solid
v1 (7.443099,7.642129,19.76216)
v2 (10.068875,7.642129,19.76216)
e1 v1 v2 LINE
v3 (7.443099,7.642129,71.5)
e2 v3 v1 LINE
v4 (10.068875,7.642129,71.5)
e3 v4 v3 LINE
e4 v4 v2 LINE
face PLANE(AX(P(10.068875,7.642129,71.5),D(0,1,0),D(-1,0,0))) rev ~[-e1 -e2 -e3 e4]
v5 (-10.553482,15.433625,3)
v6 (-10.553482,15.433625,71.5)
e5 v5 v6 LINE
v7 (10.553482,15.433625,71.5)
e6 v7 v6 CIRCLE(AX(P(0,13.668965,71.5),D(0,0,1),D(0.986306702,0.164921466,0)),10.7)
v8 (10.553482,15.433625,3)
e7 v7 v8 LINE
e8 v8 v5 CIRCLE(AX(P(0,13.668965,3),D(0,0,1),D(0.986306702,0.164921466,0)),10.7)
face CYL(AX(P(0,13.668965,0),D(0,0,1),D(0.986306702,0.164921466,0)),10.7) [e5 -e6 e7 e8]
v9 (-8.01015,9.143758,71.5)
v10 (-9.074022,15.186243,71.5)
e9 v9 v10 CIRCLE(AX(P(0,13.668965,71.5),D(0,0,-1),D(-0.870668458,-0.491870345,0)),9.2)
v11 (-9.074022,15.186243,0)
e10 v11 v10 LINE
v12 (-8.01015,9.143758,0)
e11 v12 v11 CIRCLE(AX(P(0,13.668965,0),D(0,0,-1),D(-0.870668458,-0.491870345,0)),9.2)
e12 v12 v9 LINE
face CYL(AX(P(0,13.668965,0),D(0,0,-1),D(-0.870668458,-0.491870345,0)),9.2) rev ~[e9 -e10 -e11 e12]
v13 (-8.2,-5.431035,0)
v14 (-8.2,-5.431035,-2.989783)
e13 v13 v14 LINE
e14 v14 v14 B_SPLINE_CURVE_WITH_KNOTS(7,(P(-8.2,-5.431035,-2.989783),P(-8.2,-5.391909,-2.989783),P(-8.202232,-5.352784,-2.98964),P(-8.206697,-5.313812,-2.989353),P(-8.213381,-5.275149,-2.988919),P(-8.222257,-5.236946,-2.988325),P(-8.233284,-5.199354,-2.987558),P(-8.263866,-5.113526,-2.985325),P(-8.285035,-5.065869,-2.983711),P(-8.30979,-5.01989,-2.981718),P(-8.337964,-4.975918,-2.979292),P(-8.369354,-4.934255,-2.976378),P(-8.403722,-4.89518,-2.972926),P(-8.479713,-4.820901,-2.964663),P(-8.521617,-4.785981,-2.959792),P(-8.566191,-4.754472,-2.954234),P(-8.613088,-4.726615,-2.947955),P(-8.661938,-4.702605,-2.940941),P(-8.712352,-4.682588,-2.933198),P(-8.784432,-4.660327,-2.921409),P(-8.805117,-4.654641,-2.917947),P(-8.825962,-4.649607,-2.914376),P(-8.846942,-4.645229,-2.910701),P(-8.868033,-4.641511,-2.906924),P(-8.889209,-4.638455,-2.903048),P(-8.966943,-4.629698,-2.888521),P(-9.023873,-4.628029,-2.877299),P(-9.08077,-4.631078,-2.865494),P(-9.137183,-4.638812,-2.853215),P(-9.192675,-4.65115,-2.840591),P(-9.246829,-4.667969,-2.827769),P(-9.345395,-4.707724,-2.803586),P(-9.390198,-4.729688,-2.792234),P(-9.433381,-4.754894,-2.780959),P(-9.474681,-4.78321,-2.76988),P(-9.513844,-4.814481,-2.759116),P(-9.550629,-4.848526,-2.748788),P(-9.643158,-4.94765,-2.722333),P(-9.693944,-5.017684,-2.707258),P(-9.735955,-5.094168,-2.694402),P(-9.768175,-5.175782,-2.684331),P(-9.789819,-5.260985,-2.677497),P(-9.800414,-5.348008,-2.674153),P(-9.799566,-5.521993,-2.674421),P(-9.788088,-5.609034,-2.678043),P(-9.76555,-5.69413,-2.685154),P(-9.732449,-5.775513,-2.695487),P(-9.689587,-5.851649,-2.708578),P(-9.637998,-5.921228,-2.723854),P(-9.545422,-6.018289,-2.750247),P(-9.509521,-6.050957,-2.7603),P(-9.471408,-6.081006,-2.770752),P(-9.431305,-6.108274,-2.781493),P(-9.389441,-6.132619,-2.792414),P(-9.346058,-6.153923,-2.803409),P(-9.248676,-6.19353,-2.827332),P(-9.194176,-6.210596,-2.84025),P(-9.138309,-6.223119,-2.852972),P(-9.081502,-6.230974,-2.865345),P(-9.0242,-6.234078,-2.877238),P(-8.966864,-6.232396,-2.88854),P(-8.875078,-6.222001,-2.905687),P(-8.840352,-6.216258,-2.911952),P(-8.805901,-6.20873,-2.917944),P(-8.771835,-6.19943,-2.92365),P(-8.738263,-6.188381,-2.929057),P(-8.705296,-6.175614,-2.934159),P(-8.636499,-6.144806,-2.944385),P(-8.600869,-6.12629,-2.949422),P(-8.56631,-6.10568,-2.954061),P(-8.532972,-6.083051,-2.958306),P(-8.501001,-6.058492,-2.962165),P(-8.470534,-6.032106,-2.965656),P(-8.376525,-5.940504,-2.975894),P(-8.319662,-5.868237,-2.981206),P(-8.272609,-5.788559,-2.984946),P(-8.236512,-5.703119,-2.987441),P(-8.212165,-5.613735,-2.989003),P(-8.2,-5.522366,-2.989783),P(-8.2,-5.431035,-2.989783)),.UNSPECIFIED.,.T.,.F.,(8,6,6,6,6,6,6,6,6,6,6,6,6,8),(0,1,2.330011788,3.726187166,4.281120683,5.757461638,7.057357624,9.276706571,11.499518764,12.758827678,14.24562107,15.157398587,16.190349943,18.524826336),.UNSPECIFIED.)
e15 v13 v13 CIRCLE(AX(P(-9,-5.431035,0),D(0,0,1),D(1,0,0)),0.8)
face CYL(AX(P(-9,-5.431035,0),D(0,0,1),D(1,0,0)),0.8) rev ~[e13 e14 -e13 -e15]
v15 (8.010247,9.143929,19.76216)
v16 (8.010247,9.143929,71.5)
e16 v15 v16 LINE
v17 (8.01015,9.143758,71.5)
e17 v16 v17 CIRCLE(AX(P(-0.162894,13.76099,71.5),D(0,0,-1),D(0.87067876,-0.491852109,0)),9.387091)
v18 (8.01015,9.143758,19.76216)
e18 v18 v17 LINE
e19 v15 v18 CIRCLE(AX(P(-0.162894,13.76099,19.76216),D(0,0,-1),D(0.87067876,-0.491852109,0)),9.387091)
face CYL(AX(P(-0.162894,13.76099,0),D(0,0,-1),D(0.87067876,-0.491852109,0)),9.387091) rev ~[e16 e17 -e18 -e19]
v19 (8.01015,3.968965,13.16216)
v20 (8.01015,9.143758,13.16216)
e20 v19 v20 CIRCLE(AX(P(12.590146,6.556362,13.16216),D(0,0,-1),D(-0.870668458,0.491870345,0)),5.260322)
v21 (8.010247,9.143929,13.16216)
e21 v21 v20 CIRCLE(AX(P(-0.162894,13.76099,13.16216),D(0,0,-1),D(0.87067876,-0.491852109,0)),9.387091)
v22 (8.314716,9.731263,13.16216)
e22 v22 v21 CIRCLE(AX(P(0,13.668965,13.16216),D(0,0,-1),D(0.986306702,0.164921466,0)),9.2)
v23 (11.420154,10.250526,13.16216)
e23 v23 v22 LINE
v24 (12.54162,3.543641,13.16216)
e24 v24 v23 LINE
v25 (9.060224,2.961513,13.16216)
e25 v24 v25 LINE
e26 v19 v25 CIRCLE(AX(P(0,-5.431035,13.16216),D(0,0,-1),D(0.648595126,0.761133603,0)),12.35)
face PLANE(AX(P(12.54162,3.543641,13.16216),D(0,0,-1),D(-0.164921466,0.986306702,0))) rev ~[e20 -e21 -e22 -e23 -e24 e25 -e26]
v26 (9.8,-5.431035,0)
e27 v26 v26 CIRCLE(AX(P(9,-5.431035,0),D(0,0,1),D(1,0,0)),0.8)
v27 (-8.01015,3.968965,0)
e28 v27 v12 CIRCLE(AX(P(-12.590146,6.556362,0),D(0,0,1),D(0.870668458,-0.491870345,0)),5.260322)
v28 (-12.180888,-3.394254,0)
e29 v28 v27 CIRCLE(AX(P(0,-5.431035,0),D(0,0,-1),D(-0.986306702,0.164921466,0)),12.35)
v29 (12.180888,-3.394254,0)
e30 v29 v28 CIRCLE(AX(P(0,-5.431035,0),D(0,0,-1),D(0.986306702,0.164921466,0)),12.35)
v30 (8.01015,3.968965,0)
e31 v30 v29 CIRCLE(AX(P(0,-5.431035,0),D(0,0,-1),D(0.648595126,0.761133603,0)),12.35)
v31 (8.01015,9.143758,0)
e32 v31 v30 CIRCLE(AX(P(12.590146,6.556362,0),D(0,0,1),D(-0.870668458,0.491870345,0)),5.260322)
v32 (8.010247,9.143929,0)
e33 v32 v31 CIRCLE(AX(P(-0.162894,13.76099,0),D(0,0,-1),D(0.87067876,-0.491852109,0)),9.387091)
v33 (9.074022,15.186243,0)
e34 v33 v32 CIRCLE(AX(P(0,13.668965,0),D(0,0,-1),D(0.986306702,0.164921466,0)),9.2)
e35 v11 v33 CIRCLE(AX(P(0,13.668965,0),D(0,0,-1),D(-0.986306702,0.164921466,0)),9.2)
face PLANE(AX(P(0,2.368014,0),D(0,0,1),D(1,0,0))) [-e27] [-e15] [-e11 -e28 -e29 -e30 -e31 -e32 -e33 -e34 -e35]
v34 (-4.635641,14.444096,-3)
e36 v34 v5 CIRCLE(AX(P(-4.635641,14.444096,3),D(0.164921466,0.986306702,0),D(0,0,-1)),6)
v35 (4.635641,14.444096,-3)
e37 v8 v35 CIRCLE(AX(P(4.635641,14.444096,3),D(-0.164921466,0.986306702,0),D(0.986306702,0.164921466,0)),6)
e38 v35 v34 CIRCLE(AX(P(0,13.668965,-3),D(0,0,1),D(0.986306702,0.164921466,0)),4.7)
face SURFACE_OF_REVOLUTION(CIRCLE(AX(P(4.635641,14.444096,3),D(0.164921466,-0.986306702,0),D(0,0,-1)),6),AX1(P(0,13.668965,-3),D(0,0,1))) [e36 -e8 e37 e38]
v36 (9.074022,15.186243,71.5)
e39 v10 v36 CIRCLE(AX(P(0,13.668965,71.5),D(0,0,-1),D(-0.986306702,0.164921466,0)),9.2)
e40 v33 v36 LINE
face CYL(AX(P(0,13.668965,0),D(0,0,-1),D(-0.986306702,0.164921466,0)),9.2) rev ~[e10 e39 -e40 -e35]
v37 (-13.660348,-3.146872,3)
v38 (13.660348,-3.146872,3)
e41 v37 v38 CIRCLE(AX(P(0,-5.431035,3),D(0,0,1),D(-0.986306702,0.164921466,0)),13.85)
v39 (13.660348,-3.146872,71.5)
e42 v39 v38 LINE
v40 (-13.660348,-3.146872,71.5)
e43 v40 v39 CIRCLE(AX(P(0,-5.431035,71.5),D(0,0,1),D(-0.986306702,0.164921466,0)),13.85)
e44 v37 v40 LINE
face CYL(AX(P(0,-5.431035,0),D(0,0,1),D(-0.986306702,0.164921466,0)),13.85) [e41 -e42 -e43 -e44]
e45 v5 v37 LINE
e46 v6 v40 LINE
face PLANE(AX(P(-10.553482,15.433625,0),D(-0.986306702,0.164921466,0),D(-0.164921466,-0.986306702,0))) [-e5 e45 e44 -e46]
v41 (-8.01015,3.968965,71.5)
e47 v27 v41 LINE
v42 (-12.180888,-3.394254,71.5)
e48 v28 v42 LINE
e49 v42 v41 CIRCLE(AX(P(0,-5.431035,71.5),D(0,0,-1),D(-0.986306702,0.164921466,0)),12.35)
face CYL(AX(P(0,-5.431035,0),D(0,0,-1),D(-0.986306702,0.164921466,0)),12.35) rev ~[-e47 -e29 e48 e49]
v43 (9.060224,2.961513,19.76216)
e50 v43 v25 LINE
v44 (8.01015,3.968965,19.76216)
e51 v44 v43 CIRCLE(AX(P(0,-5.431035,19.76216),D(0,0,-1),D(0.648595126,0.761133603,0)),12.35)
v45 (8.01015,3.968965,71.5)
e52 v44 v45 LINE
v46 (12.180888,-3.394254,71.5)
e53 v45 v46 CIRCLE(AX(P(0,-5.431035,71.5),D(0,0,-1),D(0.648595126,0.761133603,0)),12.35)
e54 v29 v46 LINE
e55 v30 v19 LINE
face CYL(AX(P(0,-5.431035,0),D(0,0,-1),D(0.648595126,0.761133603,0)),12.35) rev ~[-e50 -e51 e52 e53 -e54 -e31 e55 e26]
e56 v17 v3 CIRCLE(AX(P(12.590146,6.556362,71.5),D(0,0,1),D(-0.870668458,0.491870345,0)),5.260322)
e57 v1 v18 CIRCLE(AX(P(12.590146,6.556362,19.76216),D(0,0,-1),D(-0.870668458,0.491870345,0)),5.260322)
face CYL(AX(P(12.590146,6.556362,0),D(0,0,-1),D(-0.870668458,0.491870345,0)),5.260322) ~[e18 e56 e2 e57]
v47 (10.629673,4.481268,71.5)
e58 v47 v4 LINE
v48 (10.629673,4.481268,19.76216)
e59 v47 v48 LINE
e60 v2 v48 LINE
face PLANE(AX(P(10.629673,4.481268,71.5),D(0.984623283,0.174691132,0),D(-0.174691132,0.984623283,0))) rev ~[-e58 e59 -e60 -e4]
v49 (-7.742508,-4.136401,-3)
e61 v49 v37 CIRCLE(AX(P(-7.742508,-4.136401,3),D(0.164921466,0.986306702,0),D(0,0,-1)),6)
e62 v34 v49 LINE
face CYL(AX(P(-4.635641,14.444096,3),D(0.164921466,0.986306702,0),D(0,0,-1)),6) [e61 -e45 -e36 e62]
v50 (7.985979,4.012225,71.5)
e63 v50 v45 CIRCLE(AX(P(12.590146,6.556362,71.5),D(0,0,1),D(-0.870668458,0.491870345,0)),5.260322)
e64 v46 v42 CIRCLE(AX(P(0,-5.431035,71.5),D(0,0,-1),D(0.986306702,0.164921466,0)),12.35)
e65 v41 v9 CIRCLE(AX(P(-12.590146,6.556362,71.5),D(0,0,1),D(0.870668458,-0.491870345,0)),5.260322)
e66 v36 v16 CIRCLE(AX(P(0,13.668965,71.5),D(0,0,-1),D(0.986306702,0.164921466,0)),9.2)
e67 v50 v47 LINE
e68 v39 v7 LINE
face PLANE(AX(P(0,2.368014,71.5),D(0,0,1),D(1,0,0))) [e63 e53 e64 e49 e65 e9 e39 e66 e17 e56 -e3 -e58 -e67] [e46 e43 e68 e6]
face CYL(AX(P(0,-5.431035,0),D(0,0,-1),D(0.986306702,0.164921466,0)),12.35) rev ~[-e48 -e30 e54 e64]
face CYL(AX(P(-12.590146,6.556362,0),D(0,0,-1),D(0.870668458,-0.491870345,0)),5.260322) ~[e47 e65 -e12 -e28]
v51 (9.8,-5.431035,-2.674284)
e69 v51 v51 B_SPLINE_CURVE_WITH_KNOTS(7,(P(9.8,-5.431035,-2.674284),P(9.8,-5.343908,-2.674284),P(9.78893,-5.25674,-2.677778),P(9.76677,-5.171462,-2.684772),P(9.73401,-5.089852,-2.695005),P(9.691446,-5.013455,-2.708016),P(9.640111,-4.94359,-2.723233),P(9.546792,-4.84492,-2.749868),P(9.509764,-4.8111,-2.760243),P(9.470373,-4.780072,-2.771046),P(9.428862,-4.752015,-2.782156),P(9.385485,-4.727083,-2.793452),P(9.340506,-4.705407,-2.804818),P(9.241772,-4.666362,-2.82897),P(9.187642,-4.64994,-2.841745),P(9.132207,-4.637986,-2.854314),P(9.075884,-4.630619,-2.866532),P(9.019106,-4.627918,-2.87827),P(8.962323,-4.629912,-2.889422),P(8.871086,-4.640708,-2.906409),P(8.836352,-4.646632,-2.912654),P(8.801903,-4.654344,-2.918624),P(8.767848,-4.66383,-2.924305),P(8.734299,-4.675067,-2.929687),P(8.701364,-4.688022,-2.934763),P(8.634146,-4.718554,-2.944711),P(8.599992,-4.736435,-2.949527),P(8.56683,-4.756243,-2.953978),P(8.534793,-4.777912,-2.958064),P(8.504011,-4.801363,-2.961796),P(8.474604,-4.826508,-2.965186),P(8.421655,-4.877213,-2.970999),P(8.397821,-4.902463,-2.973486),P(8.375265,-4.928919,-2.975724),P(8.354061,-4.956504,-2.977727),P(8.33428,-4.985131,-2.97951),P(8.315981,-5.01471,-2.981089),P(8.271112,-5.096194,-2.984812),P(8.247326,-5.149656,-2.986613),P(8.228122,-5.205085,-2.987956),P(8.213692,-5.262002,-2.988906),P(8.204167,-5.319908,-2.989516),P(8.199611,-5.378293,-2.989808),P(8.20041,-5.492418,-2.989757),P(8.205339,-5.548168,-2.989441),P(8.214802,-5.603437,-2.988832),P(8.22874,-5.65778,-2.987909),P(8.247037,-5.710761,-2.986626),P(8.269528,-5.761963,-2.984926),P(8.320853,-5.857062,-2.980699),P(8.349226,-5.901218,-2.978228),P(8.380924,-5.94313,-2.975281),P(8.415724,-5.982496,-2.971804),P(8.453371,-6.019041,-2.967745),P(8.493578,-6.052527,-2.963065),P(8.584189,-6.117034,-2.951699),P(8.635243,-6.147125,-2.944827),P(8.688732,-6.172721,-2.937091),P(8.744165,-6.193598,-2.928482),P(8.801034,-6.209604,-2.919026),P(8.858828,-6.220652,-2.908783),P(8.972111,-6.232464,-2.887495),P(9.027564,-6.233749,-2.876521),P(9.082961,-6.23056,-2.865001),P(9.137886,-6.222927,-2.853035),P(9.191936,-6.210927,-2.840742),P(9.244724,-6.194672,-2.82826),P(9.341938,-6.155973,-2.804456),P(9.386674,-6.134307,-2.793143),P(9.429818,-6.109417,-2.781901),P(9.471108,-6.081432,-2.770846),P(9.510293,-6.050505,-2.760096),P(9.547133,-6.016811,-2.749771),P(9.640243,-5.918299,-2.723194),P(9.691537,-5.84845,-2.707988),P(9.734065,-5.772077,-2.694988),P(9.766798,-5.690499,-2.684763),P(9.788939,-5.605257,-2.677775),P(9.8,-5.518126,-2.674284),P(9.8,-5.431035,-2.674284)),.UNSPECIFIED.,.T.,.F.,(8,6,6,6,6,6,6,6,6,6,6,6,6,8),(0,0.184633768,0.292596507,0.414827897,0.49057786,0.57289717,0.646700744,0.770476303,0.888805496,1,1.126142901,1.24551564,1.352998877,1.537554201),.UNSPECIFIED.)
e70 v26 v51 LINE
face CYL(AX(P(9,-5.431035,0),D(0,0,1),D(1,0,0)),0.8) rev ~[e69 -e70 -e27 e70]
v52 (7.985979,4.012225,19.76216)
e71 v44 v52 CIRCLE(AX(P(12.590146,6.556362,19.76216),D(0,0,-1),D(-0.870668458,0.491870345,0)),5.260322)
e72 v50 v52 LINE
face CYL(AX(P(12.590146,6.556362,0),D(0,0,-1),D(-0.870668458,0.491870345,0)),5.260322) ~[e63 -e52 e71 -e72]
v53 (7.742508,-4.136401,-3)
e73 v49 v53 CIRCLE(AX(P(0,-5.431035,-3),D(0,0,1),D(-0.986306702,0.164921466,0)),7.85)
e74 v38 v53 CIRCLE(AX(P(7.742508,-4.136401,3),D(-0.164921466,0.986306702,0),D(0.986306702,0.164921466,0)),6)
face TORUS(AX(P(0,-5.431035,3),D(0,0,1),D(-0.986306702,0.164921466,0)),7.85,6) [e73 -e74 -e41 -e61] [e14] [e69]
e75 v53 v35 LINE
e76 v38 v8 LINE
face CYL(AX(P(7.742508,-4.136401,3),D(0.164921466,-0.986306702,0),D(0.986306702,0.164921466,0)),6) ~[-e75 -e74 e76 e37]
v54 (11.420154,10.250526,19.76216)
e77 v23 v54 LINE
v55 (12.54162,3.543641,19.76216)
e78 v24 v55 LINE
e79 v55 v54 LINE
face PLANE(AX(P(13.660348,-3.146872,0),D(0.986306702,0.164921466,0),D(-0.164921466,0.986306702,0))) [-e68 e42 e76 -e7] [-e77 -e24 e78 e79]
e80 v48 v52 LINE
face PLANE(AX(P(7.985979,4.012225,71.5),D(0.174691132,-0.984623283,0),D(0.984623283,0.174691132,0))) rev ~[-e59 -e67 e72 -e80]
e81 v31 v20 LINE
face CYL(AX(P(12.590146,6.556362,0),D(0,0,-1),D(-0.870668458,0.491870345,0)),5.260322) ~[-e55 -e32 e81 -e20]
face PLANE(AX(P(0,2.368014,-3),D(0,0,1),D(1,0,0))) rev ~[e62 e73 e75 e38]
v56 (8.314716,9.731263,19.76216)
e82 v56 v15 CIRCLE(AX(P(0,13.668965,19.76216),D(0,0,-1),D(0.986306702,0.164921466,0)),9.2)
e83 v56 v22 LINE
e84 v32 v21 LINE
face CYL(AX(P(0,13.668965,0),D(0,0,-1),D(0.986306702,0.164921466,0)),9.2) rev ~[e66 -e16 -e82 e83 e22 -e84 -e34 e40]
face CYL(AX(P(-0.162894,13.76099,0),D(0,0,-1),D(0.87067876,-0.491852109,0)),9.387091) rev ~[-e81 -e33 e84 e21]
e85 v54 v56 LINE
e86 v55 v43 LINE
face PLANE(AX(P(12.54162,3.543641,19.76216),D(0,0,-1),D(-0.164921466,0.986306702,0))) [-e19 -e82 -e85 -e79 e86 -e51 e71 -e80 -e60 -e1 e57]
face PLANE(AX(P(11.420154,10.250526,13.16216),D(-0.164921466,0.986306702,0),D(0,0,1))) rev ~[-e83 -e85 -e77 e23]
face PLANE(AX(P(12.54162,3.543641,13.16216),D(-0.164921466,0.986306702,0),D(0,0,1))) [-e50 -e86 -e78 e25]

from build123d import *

# Parameters (mm, degrees)
F1_DEPTH    = 71.5
F0_R        = 0.8
F2_DEPTH    = 3
F3_T1_DEPTH = 18.8384580048
F3_T3_DEPTH = 18.8384580048
F3_T6_ANGLE = 198.9853445977
F3_T8_ANGLE = 161.0146554023
F6_W        = 6.8
F6_H        = 6.6
F7_DEPTH    = 10
F9_DEPTH    = 57.4


# Not quite as in the source:
# - a fillet or chamfer that OpenCascade refuses, or shapes differently, is made with other operations: its cross-section is extruded or revolved along the edge and cut away or added


with BuildPart() as f1:
    # F0 (on Top) → F1 (new body)
    with BuildSketch(Plane.XY):
        with BuildLine():
            ThreePointArc((10.5534817095, 15.4336250836), (0, 24.3689653978), (-10.5534817095, 15.4336250836))
            Line((-10.5534817095, 15.4336250836), (-13.6603478203, -3.1468722986))
            ThreePointArc((-13.6603478203, -3.1468722986), (0, -19.2810346022), (13.6603478203, -3.1468722986))
            Line((13.6603478203, -3.1468722986), (10.5534817095, 15.4336250836))
        make_face()
        with BuildLine():
            ThreePointArc((-12.1808877675, -3.3942544975), (-10.7458713669, 0.6557337165), (-8.0101498113, 3.9689653978))
            ThreePointArc((-8.0101498113, 3.9689653978), (-7.3298242511, 6.556361809), (-8.0101498113, 9.1437582202))
            ThreePointArc((-8.0101498113, 9.1437582202), (-9.0606365073, 12.0737017575), (-9.0740216568, 15.1862428847))
            ThreePointArc((-9.0740216568, 15.1862428847), (0, 22.8689653978), (9.0740216568, 15.1862428847))
            ThreePointArc((9.0740216568, 15.1862428847), (9.0606535532, 12.0737985759), (8.0102465186, 9.1439294077))
            ThreePointArc((8.0102465186, 9.1439294077), (8.0101981654, 9.1438438137), (8.0101498113, 9.1437582202))
            ThreePointArc((8.0101498113, 9.1437582202), (7.3298242511, 6.556361809), (8.0101498113, 3.9689653978))
            ThreePointArc((8.0101498113, 3.9689653978), (10.7458713669, 0.6557337165), (12.1808877675, -3.3942544975))
            ThreePointArc((12.1808877675, -3.3942544975), (0, -17.7810346022), (-12.1808877675, -3.3942544975))
        make_face(mode=Mode.SUBTRACT)
    extrude(amount=F1_DEPTH)

    # F0 (on Top) → F2 (join)
    with BuildSketch(Plane.XY):
        with BuildLine():
            ThreePointArc((10.5534817095, 15.4336250836), (0, 24.3689653978), (-10.5534817095, 15.4336250836))
            Line((-10.5534817095, 15.4336250836), (-13.6603478203, -3.1468722986))
            ThreePointArc((-13.6603478203, -3.1468722986), (0, -19.2810346022), (13.6603478203, -3.1468722986))
            Line((13.6603478203, -3.1468722986), (10.5534817095, 15.4336250836))
        make_face()
        with BuildLine():
            ThreePointArc((-12.1808877675, -3.3942544975), (-10.7458713669, 0.6557337165), (-8.0101498113, 3.9689653978))
            ThreePointArc((-8.0101498113, 3.9689653978), (-7.3298242511, 6.556361809), (-8.0101498113, 9.1437582202))
            ThreePointArc((-8.0101498113, 9.1437582202), (-9.0606365073, 12.0737017575), (-9.0740216568, 15.1862428847))
            ThreePointArc((-9.0740216568, 15.1862428847), (0, 22.8689653978), (9.0740216568, 15.1862428847))
            ThreePointArc((9.0740216568, 15.1862428847), (9.0606535532, 12.0737985759), (8.0102465186, 9.1439294077))
            ThreePointArc((8.0102465186, 9.1439294077), (8.0101981654, 9.1438438137), (8.0101498113, 9.1437582202))
            ThreePointArc((8.0101498113, 9.1437582202), (7.3298242511, 6.556361809), (8.0101498113, 3.9689653978))
            ThreePointArc((8.0101498113, 3.9689653978), (10.7458713669, 0.6557337165), (12.1808877675, -3.3942544975))
            ThreePointArc((12.1808877675, -3.3942544975), (0, -17.7810346022), (-12.1808877675, -3.3942544975))
        make_face(mode=Mode.SUBTRACT)
        with BuildLine():
            ThreePointArc((-9.0740216568, 15.1862428847), (-9.0606365073, 12.0737017575), (-8.0101498113, 9.1437582202))
            ThreePointArc((-8.0101498113, 9.1437582202), (0, 4.4689653978), (8.0101498113, 9.1437582202))
            ThreePointArc((8.0101498113, 9.1437582202), (8.0101981654, 9.1438438137), (8.0102465186, 9.1439294077))
            ThreePointArc((8.0102465186, 9.1439294077), (9.0606535532, 12.0737985759), (9.0740216568, 15.1862428847))
            ThreePointArc((9.0740216568, 15.1862428847), (0, 22.8689653978), (-9.0740216568, 15.1862428847))
        make_face()
        with BuildLine():
            ThreePointArc((-8.0101498113, 9.1437582202), (-7.3298242511, 6.556361809), (-8.0101498113, 3.9689653978))
            Line((-8.0101498113, 3.9689653978), (8.0101498113, 3.9689653978))
            ThreePointArc((8.0101498113, 3.9689653978), (7.3298242511, 6.556361809), (8.0101498113, 9.1437582202))
            ThreePointArc((8.0101498113, 9.1437582202), (0, 4.4689653978), (-8.0101498113, 9.1437582202))
        make_face()
        with BuildLine():
            Line((8.0101498113, 3.9689653978), (-8.0101498113, 3.9689653978))
            ThreePointArc((-8.0101498113, 3.9689653978), (-10.7458713669, 0.6557337165), (-12.1808877675, -3.3942544975))
            ThreePointArc((-12.1808877675, -3.3942544975), (0, -17.7810346022), (12.1808877675, -3.3942544975))
            ThreePointArc((12.1808877675, -3.3942544975), (10.7458713669, 0.6557337165), (8.0101498113, 3.9689653978))
        make_face()
        with Locations((-9, -5.4310346022)):
            Circle(F0_R, mode=Mode.SUBTRACT)
        with Locations((9, -5.4310346022)):
            Circle(F0_R, mode=Mode.SUBTRACT)
    extrude(amount=-F2_DEPTH)

    # F3: fillet of radius 6 on 1 edges, made by hand

    # F3_s2 → F3_t1 (cut)
    with BuildSketch(Plane(origin=(2.22343693, 13.2971819786, 0), x_dir=(0, 0, 1), z_dir=(-0.164921466, -0.9863067018, 0))):
        with BuildLine():
            ThreePointArc((-3, 6.9543058117), (-1.2426406871, 11.1969464988), (3, 12.9543058117))
            Line((3, 12.9543058117), (-3, 12.9543058117))
            Line((-3, 12.9543058117), (-3, 6.9543058117))
        make_face()
    extrude(amount=F3_T1_DEPTH, mode=Mode.SUBTRACT)

    # F3_s4 → F3_t3 (cut)
    with BuildSketch(Plane(origin=(0.8834291807, -5.2833154036, 0), x_dir=(0, 0, 1), z_dir=(-0.164921466, 0.9863067018, 0))):
        with BuildLine():
            ThreePointArc((3, 12.9543058117), (-1.2426406871, 11.1969464988), (-3, 6.9543058117))
            Line((-3, 6.9543058117), (-3, 12.9543058117))
            Line((-3, 12.9543058117), (3, 12.9543058117))
        make_face()
    extrude(amount=F3_T3_DEPTH, mode=Mode.SUBTRACT)

    # F3_s5 → F3_t6 (revolve, cut)
    with BuildSketch(Plane(origin=(-0.8834291807, -5.2833154036, 0), x_dir=(0, 0, 1), z_dir=(0.164921466, 0.9863067018, 0))):
        with BuildLine():
            ThreePointArc((-3, -6.9543058117), (-1.2426406871, -11.1969464988), (3, -12.9543058117))
            Line((3, -12.9543058117), (-3, -12.9543058117))
            Line((-3, -12.9543058117), (-3, -6.9543058117))
        make_face()
    revolve(axis=Axis((0, -5.4310346022, -3), (0, 0, 1)), revolution_arc=F3_T6_ANGLE, mode=Mode.SUBTRACT)

    # F3_s7 → F3_t8 (revolve, cut)
    with BuildSketch(Plane(origin=(-2.22343693, 13.2971819786, 0), x_dir=(0, 0, 1), z_dir=(0.164921466, -0.9863067018, 0))):
        with BuildLine():
            ThreePointArc((-3, -6.9543058117), (-1.2426406871, -11.1969464988), (3, -12.9543058117))
            Line((3, -12.9543058117), (-3, -12.9543058117))
            Line((-3, -12.9543058117), (-3, -6.9543058117))
        make_face()
    revolve(axis=Axis((0, 13.6689653978, -3), (0, 0, 1)), revolution_arc=F3_T8_ANGLE, mode=Mode.SUBTRACT)

    # F6 (on face) → F7 (cut)
    with BuildSketch(Plane(origin=(12.7769186395, 2.1364431051, 0), x_dir=(-0.164921466, 0.9863067018, 0), z_dir=(0.9863067018, 0.164921466, 0))):
        with Locations((4.8267343795, 16.4621602923)):
            Rectangle(F6_W, F6_H)
    extrude(amount=-F7_DEPTH, mode=Mode.SUBTRACT)

    # F8 (on face) → F9 (cut)
    with BuildSketch(Plane.XY.offset(71.5)):
        with BuildLine():
            Line((10.0688748062, 7.6421294361), (7.4430989219, 7.6421294361))
            ThreePointArc((7.4430989219, 7.6421294361), (7.3876854798, 5.7782940298), (7.9859788071, 4.0122254677))
            Line((7.9859788071, 4.0122254677), (10.6296725571, 4.4812676497))
            Line((10.6296725571, 4.4812676497), (10.0688748062, 7.6421294361))
        make_face()
    extrude(amount=-F9_DEPTH, mode=Mode.SUBTRACT)


solid = f1.part
